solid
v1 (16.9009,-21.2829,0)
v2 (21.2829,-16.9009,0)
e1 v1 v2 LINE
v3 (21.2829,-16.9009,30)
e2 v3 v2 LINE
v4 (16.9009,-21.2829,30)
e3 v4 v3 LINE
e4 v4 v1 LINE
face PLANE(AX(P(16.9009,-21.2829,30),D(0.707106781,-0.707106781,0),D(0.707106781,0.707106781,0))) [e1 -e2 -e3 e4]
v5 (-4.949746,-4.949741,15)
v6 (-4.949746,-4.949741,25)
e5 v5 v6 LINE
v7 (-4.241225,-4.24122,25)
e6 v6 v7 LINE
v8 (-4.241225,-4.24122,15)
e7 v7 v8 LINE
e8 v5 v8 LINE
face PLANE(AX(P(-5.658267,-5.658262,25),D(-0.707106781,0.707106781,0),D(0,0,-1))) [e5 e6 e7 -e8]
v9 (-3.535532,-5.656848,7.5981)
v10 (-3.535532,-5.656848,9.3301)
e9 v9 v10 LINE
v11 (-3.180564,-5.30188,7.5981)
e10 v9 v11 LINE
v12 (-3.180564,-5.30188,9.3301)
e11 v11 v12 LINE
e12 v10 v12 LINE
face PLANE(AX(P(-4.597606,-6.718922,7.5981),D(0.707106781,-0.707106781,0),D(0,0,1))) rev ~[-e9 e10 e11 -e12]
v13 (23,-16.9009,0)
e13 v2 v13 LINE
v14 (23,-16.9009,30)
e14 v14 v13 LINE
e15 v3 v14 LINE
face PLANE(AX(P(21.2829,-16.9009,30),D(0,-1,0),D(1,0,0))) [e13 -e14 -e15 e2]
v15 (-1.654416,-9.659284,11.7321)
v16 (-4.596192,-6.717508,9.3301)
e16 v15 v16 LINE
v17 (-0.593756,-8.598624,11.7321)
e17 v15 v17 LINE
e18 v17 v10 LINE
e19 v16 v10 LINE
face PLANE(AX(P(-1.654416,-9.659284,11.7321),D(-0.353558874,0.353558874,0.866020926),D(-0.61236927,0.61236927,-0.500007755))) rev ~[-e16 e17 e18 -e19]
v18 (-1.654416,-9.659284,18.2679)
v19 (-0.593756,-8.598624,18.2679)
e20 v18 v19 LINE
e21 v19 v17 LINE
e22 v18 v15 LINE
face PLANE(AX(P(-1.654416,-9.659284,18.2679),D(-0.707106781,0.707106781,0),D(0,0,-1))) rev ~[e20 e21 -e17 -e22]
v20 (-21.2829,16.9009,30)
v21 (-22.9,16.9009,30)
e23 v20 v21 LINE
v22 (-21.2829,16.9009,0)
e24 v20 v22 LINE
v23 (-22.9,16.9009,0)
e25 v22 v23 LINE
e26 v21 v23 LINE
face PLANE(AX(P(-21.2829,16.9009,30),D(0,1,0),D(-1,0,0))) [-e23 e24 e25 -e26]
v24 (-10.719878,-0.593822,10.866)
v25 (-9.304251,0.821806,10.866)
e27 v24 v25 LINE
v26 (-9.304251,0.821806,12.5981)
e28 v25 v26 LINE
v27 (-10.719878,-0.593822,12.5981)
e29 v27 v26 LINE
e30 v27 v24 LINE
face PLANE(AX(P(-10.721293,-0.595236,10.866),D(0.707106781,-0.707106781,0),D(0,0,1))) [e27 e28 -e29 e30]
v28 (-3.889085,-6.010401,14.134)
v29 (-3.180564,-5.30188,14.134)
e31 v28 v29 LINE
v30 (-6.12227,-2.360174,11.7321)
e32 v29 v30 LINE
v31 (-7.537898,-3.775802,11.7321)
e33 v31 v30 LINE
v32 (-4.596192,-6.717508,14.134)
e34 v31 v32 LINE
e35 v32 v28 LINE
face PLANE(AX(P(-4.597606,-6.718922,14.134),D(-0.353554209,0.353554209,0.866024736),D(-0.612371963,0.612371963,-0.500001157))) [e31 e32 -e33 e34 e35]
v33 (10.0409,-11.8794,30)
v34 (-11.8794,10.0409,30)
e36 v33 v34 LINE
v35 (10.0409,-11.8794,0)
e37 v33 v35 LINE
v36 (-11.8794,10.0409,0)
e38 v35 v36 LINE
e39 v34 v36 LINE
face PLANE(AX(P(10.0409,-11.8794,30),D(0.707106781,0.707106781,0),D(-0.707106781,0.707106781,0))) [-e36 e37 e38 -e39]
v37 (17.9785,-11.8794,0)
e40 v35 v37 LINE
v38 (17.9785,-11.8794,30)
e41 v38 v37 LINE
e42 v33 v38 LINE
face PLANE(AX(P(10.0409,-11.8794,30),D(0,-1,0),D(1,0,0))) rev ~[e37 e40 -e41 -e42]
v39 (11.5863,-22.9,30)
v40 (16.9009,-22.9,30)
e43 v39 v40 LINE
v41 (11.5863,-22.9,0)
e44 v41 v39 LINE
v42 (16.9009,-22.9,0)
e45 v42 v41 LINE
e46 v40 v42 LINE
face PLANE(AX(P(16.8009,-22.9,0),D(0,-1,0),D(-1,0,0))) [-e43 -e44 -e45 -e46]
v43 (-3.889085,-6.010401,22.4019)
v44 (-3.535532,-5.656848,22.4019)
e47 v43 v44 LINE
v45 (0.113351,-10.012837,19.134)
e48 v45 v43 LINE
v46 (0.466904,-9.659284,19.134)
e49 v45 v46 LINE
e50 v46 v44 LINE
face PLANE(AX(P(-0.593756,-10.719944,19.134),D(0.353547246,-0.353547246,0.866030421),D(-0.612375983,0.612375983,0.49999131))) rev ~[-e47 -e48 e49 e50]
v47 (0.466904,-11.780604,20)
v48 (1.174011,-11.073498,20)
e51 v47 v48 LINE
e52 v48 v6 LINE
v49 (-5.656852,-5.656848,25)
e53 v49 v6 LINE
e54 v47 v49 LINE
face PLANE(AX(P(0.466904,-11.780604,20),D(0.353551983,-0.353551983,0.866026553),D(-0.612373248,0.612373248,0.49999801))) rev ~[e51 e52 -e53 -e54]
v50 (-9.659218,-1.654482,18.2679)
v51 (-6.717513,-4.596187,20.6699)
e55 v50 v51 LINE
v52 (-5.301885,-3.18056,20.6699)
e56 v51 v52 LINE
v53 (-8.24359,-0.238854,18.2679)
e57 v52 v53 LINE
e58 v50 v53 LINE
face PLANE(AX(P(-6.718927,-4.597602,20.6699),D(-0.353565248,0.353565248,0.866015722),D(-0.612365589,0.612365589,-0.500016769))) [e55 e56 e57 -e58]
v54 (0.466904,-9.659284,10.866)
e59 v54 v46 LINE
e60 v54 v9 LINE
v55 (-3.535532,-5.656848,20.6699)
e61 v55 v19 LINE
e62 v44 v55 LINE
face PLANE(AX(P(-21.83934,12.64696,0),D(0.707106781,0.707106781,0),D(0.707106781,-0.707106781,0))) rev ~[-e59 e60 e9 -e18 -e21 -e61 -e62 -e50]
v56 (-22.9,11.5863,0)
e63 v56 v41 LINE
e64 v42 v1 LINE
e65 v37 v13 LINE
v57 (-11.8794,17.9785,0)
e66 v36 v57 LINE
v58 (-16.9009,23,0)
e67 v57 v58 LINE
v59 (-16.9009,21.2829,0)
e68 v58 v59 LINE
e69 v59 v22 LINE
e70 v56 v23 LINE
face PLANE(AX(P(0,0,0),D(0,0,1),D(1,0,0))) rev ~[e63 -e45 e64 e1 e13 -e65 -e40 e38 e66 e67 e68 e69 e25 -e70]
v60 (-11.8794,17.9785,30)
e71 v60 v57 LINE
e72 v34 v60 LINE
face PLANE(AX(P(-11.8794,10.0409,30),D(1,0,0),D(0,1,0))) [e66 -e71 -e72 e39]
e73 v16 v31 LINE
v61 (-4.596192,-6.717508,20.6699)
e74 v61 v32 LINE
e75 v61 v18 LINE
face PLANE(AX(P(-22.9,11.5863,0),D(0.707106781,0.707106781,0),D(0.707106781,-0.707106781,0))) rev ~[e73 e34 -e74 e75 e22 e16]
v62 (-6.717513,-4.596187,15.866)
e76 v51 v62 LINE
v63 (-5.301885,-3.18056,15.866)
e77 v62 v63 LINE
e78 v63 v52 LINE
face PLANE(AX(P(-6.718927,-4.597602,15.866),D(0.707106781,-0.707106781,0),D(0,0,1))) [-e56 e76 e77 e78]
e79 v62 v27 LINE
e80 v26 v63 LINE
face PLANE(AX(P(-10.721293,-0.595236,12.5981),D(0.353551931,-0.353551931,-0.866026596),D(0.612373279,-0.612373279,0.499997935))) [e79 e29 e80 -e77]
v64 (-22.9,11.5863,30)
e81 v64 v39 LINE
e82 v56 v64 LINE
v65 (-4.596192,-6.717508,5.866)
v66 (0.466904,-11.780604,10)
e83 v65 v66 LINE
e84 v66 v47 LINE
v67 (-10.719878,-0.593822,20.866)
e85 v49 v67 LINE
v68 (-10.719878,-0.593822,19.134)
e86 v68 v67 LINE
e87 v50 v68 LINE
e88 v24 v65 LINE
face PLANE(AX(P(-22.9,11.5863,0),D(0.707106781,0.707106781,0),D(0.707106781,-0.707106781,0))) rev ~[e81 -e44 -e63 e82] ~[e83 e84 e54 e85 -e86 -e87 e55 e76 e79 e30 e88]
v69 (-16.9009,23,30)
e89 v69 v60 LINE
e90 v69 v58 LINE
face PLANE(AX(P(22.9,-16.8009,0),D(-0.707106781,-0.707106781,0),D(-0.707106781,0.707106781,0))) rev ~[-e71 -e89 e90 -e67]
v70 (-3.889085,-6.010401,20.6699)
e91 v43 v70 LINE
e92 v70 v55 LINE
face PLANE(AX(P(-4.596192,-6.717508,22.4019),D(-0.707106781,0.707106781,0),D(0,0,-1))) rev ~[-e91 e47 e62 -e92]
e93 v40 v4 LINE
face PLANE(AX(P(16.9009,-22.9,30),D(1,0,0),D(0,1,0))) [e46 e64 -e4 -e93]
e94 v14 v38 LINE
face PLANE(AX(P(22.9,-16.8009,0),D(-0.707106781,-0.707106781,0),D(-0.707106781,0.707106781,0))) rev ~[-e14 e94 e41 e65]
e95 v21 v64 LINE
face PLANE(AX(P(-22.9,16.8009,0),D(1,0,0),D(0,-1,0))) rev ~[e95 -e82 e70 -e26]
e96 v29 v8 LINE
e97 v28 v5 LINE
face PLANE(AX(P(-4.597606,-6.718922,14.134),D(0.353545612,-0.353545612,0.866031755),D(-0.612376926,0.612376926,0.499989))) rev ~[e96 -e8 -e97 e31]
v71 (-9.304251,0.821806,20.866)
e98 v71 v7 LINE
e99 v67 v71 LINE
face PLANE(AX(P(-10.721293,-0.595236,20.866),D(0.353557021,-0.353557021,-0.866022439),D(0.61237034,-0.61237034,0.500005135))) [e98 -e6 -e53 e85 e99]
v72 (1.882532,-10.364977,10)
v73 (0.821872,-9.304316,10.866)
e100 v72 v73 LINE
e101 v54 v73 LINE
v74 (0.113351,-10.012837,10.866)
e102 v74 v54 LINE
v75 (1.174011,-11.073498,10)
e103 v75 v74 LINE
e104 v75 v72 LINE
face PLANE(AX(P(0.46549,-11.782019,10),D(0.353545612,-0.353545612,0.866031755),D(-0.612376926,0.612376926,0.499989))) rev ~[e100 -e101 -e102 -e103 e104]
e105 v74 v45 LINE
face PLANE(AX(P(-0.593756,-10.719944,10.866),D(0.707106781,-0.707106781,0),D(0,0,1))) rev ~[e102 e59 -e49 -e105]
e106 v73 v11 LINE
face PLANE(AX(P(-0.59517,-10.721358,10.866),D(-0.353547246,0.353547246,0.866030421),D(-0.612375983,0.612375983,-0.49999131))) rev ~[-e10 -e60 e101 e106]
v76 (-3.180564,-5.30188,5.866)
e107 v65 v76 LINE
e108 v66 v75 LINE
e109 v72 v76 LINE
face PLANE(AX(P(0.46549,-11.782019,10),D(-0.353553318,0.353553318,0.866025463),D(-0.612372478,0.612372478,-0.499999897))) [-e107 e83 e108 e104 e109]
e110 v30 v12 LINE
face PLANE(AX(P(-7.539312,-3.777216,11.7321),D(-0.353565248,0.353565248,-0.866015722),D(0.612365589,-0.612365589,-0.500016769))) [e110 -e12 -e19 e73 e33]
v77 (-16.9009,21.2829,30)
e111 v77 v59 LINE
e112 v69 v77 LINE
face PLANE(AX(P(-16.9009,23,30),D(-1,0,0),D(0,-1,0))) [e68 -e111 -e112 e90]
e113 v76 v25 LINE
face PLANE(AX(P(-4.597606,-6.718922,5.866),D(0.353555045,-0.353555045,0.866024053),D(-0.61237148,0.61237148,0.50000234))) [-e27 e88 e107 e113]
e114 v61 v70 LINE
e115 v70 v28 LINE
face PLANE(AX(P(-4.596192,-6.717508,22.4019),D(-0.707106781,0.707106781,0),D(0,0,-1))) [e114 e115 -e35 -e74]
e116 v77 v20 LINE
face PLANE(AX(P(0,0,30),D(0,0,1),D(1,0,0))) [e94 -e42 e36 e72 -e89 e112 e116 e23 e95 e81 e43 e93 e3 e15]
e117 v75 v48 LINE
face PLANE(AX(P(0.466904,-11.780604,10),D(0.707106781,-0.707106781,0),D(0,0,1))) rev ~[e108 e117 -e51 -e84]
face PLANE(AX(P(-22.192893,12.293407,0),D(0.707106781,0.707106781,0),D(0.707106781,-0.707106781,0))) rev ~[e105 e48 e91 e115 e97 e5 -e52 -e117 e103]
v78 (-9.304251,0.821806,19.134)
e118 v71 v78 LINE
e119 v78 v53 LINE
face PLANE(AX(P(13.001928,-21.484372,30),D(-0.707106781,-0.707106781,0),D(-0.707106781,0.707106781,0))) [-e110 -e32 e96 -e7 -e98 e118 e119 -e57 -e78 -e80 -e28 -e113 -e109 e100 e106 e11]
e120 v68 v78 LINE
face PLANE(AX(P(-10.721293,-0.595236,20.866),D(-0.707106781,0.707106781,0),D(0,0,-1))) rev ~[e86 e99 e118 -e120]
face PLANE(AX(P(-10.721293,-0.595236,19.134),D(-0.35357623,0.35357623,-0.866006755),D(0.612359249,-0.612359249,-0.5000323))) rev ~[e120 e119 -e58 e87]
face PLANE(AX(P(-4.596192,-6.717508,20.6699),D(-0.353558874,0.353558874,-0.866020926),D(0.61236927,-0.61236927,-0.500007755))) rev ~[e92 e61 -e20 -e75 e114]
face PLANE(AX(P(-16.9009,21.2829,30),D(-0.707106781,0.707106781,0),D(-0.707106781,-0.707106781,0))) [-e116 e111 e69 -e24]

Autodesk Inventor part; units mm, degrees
ref_plane "YZ Plane" through (0, 0, 0) normal (1, 0, 0) x (0, 1, 0)
ref_plane "XZ Plane" through (0, 0, 0) normal (0, 1, 0) x (-1, 0, 0)
ref_plane "XY Plane" through (0, 0, 0) normal (0, 0, 1) x (1, 0, 0)
sketch "Sketch1" plane through (0, 0, 0) normal (0, 0, 1) x (1, 0, 0)
  line L0 (-16.9, 21.4) -> (-16.9, 16.9) construction
  arc A0 (-22.9, 19.9) -> (-19.9, 22.9) centre (-19.9, 19.9) ccw construction
  line L1 (-16.9, 16.9) -> (16.9, 16.9) construction
  line L2 (16.9, 16.9) -> (16.9, -16.9) construction
  line L3 (16.9, -16.9) -> (-16.9, -16.9) construction
  line L4 (-16.9, -16.9) -> (-16.9, 16.9) construction
  arc A1 (22.9, -19.9) -> (19.9, -22.9) centre (19.9, -19.9) ccw construction
  line L5 (22.9, 19.9) -> (22.9, -19.9) construction
  arc A2 (19.9, 22.9) -> (22.9, 19.9) centre (19.9, 19.9) ccw construction
  line L6 (-19.9, 22.9) -> (19.9, 22.9) construction
  arc A3 (-22.9, 19.9) -> (-19.9, 22.9) centre (-19.9, 19.9) ccw construction
  line L7 (-22.9, -19.9) -> (-22.9, 19.9) construction
  arc A4 (-19.9, -22.9) -> (-22.9, -19.9) centre (-19.9, -19.9) ccw construction
  line L8 (19.9, -22.9) -> (-19.9, -22.9) construction
  line L9 (-21.4, 16.9) -> (-16.9, 16.9) construction
  line L10 (-16.9, -16.9) -> (-21.4, -16.9) construction
  line L11 (-16.9, -16.9) -> (-16.9, -21.4) construction
  line L12 (16.9, -21.4) -> (16.9, -16.9) construction
  line L13 (21.4, -16.9) -> (16.9, -16.9) construction
  line L14 (16.9, 16.9) -> (21.4, 16.9) construction
  line L15 (16.9, 16.9) -> (16.9, 21.4) construction
  line L16 (-16.8009, 21.2415) -> (21.2415, -16.8009)
  line L17 (21.2415, -16.8009) -> (16.8009, -21.2415)
  line L18 (16.8009, -21.2415) -> (-21.2415, 16.8009)
  line L19 (-21.2415, 16.8009) -> (-16.8009, 21.2415)
  line L20 (-16.8009, 21.2415) -> (16.8009, -21.2415) construction
  line L21 (21.2415, -16.8009) -> (-21.2415, 16.8009) construction
  line L22 (-16.8009, 21.2415) -> (36.9991, 21.2415) construction
  line L23 (-21.2415, 16.8009) -> (-22.9, 16.8009)
  line L24 (16.8009, -21.2415) -> (16.8009, -22.9)
  line L25 (16.8009, -22.9) -> (-22.9, 16.8009)
  line L26 (-16.8009, 21.2415) -> (-16.8009, 22.9)
  line L27 (21.2415, -16.8009) -> (22.9, -16.8009)
  line L28 (22.9, -16.8009) -> (-16.8009, 22.9)
  line L29 (-22.9, 16.8009) -> (-22.9, 11.5863)
  line L30 (16.8009, -22.9) -> (11.5863, -22.9)
  line L31 (-22.9, 11.5863) -> (11.5863, -22.9)
  point P0 (0, 0)
  dimension "d0" = 53.8
  dimension "d1" = 45
  dimension "d2" = 6.28
  dimension "d5" = 8
extrude "Extrusion1" add sketch "Sketch1" along normal blind 30
ref_plane "Work Plane1" through (16.9, -16.9, -8) normal (-0.7071068, -0.7071068, 0) x (0, 0, 1)
sketch "Sketch7" plane through (0, 0, 30) normal (0, 0, 1) x (1, 0, 0)
  line L0 (21.2415, -16.8009) -> (22.9, -16.8009) projected
  line L1 (22.9, -16.8009) -> (-16.8009, 22.9) projected
  line L2 (-16.8009, 22.9) -> (-16.8009, 21.2415) projected
  line L3 (-16.8009, 21.2415) -> (-21.2415, 16.8009) projected
  line L4 (-21.2415, 16.8009) -> (-22.9, 16.8009) projected
  line L5 (-22.9, 16.8009) -> (-22.9, 11.5863) projected
  line L6 (-22.9, 11.5863) -> (11.5863, -22.9) projected
  line L7 (11.5863, -22.9) -> (16.8009, -22.9) projected
  line L8 (16.8009, -22.9) -> (16.8009, -21.2415) projected
  line L9 (16.8009, -21.2415) -> (21.2415, -16.8009) projected
  line L10 (3.0496, 3.0496) -> (-5.6569, -5.6569)
  line L11 (-22.9, 11.5863) -> (11.5863, -22.9) projected
  line L12 (17.9785, -3.9418) -> (10.0409, -11.8794)
  line L13 (10.0409, -11.8794) -> (-11.8794, 10.0409)
  line L14 (-11.8794, 10.0409) -> (-3.9418, 17.9785)
  line L15 (-3.9418, 17.9785) -> (17.9785, -3.9418)
  line L16 (17.9785, -3.9418) -> (-11.8794, 10.0409) construction
  line L17 (10.0409, -11.8794) -> (-3.9418, 17.9785) construction
  line L18 (-11.8794, 10.0409) -> (-11.8794, 17.9785)
  line L19 (22.9, -16.8009) -> (-16.8009, 22.9) projected
  line L20 (10.0409, -11.8794) -> (17.9785, -11.8794)
  point P0 (0, 0)
  dimension "d28" = 31
  dimension "d29" = 1.3
extrude "Extrusion7" cut sketch "Sketch7" against normal through all contours L20 L12 L1 | L12 L13 L10 L1 | L1 L14 L15 L12 | L10 L13 L14 L1 | L14 L18 L1
sketch "Sketch10" plane through (11.5863, -22.9, 30) normal (-0.7071068, -0.7071068, 0) x (-0.7071068, 0.7071068, 0)
  line L0 (1.6838, 16.5215) -> (7.0744, 16.5215) construction
  line L1 (7.0744, 16.5215) -> (7.0744, 10.5304) construction
  line L2 (7.0744, 10.5304) -> (1.6838, 10.5304) construction
  line L3 (1.6838, 10.5304) -> (1.6838, 6.839) construction
  line L4 (1.6838, 6.839) -> (6.7206, 6.839) construction
  line L5 (6.7206, 6.839) -> (6.7206, 1.2092) construction
  line L6 (6.7206, 1.2092) -> (1.6838, 1.2092) construction
  line L7 (1.6838, 1.2092) -> (1.6838, -3.423) construction
  line L8 (1.6838, -3.423) -> (34.6838, -3.423) construction
  line L9 (34.6838, 30.377) -> (1.6838, 30.377) construction
  line L10 (1.6838, 30.377) -> (1.6838, 26.2152) construction
  line L11 (1.6838, 26.2152) -> (7.1181, 26.2152) construction
  line L12 (7.1181, 26.2152) -> (7.1181, 20.0634) construction
  line L13 (7.1181, 20.0634) -> (1.6838, 20.0634) construction
  line L14 (1.6838, 20.0634) -> (1.6838, 16.5215) construction
  line L15 (7.0744, 13.526) -> (34.6838, 13.477) construction
  line L16 (1.6838, 30.377) -> (36.6838, 30.377) construction
  line L17 (36.6838, -3.423) -> (1.6838, -3.423) construction
  line L18 (15.7252, 20) -> (15.7252, 10)
  line L19 (15.7252, 10) -> (24.3855, 5)
  line L20 (15.7252, 20) -> (17.2252, 19.134)
  line L21 (17.2252, 19.134) -> (17.2252, 10.866)
  line L22 (17.2252, 10.866) -> (22.8855, 7.5981)
  line L23 (22.8855, 7.5981) -> (22.8855, 15.866)
  line L24 (22.8855, 15.866) -> (24.3855, 15)
  line L25 (24.3855, 15) -> (24.3855, 5)
  line L26 (34.6838, 30.377) -> (34.6838, -3.423)
  line L27 (24.3855, 31.8785) -> (24.3855, -1.9215) construction
  line L28 (1.6838, -3.423) -> (34.6838, -3.423) construction
  line L29 (34.6838, 30.377) -> (34.6838, 30.377) construction
  line L30 (34.6838, 30.377) -> (34.6838, -3.423) construction
  line L31 (34.6838, -3.423) -> (34.6838, -3.423) construction
  line L32 (34.6838, -3.423) -> (34.6838, 30.377) construction
  line L33 (48.771, 30) -> (0, 30) construction
  line L34 (0, 30) -> (0, 0) construction
  line L35 (48.771, 0) -> (0, 0) construction
  line L36 (48.771, 30) -> (48.771, 0) construction
  line L37 (24.3855, 30) -> (24.3855, 0) construction
  line L38 (48.771, 0) -> (0, 0) construction
  line L39 (48.771, 30) -> (48.771, 0) construction
  line L40 (48.771, 15) -> (0, 15) construction
  line L41 (0, 30) -> (0, 0) construction
  point P0 (24.3855, 15)
  dimension "d40" = 1.5
  dimension "d41" = 1.5
  dimension "d42" = 1.5
  dimension "d43" = 10
  dimension "d44" = 10
emboss "Emboss1" sketch "Sketch10" operation cut depth 1 direction (0.7071068, 0.7071068, 0)
sketch "Sketch11" plane through (11.5863, -22.9, 30) normal (-0.7071068, -0.7071068, 0) x (-0.7071068, 0.7071068, 0)
  line L0 (17.2252, 10.866) -> (22.8855, 7.5981) construction
  line L1 (22.8855, 7.5981) -> (22.8855, 15.866) construction
  line L2 (22.8855, 15.866) -> (24.3855, 15) construction
  line L3 (24.3855, 15) -> (24.3855, 5) construction
  line L4 (24.3855, 5) -> (15.7252, 10) construction
  line L5 (15.7252, 10) -> (15.7252, 20) construction
  line L6 (15.7252, 20) -> (17.2252, 19.134) construction
  line L7 (17.2252, 19.134) -> (17.2252, 10.866) construction
  line L8 (48.771, 30) -> (0, 30) construction
  line L9 (0, 30) -> (0, 0) construction
  line L10 (48.771, 0) -> (0, 0) construction
  line L11 (48.771, 30) -> (48.771, 0) construction
  line L12 (15.7252, 20) -> (17.2252, 19.134) construction
  line L13 (17.2252, 19.134) -> (17.2252, 10.866) construction
  line L14 (17.2252, 10.866) -> (22.8855, 7.5981) construction
  line L15 (22.8855, 7.5981) -> (22.8855, 15.866) construction
  line L16 (22.8855, 15.866) -> (24.3855, 15) construction
  line L17 (24.3855, 15) -> (24.3855, 5) construction
  line L18 (24.3855, 5) -> (15.7252, 10) construction
  line L19 (15.7252, 10) -> (15.7252, 20) construction
  line L20 (15.5651, 18.4016) -> (15.5, -16.9) construction
  line L21 (15.5651, 18.4016) -> (-17.5, 16.9) construction
  line L22 (-17.5, 16.9) -> (-17.5, 12.7382) construction
  line L23 (-17.5, 12.7382) -> (-12.0658, 12.7382) construction
  line L24 (-12.0658, 12.7382) -> (-12.0658, 6.5864) construction
  line L25 (-12.0658, 6.5864) -> (-17.5, 6.5864) construction
  line L26 (-17.5, 6.5864) -> (-17.5, 3.0446) construction
  line L27 (-17.5, 3.0446) -> (-12.1095, 3.0446) construction
  line L28 (-12.1095, 3.0446) -> (-12.1095, -2.9465) construction
  line L29 (-12.1095, -2.9465) -> (-17.5, -2.9465) construction
  line L30 (-17.5, -2.9465) -> (-17.5, -6.638) construction
  line L31 (-17.5, -6.638) -> (-12.4632, -6.638) construction
  line L32 (-12.4632, -6.638) -> (-12.4632, -12.2678) construction
  line L33 (-12.4632, -12.2678) -> (-17.5, -12.2678) construction
  line L34 (-17.5, -12.2678) -> (-17.5, -16.9) construction
  line L35 (-17.5, -16.9) -> (15.5, -16.9) construction
  line L36 (-12.1095, 0.049) -> (15.5326, 0.7508) construction
  line L37 (15.5, -16.9) -> (15.5651, 18.4016) construction
  line L38 (1.91, 17.7815) -> (1.91, -16.9) construction
  line L39 (15.5, -16.9) -> (-17.5, -16.9) construction
  line L40 (22.8855, 7.5981) -> (22.8855, 15.866) construction
  line L41 (17.2252, 19.134) -> (17.2252, 10.866)
  line L42 (17.2252, 10.866) -> (22.8855, 7.5981)
  line L43 (17.2252, 19.134) -> (17.2252, 10.866)
  line L44 (17.2252, 10.866) -> (22.8855, 7.5981)
  line L45 (22.8855, 7.5981) -> (22.8855, 9.3301)
  line L46 (22.8855, 7.5981) -> (22.8855, 15.866)
  line L47 (22.8855, 9.3301) -> (18.7252, 11.7321)
  line L48 (18.7252, 11.7321) -> (18.7252, 18.2679)
  line L49 (18.7252, 18.2679) -> (22.8855, 20.6699)
  line L50 (17.2252, 19.134) -> (22.8855, 22.4019)
  line L51 (22.8855, 22.4019) -> (22.8855, 20.6699)
  point P0 (24.3855, 30)
  point P1 (20.9754, 14.9785)
  dimension "d47" = 120
  dimension "d48" = 1.5
  dimension "d49" = 1.5
  dimension "d50" = 1.5
emboss "Emboss2" sketch "Sketch11" operation cut depth 1.5 direction (0.7071068, 0.7071068, 0)
sketch "Sketch12" plane through (11.5863, -22.9, 30) normal (-0.7071068, -0.7071068, 0) x (-0.7071068, 0.7071068, 0)
  line L0 (18.7252, 11.7321) -> (22.8855, 9.3301) construction
  line L1 (22.8855, 9.3301) -> (22.8855, 15.866) construction
  line L2 (22.8855, 15.866) -> (24.3855, 15) construction
  line L3 (24.3855, 15) -> (24.3855, 5) construction
  line L4 (24.3855, 5) -> (15.7252, 10) construction
  line L5 (15.7252, 10) -> (15.7252, 20) construction
  line L6 (15.7252, 20) -> (17.2252, 19.134) construction
  line L7 (17.2252, 19.134) -> (22.8855, 22.4019) construction
  line L8 (22.8855, 22.4019) -> (22.8855, 20.6699) construction
  line L9 (22.8855, 20.6699) -> (18.7252, 18.2679) construction
  line L10 (18.7252, 18.2679) -> (18.7252, 11.7321) construction
  line L11 (48.771, 30) -> (0, 30) construction
  line L12 (0, 30) -> (0, 0) construction
  line L13 (48.771, 0) -> (0, 0) construction
  line L14 (48.771, 30) -> (48.771, 0) construction
  line L15 (18.7252, 11.7321) -> (22.8855, 9.3301) construction
  line L16 (22.8855, 9.3301) -> (22.8855, 15.866) construction
  line L17 (22.8855, 15.866) -> (24.3855, 15) construction
  line L18 (24.3855, 15) -> (24.3855, 5) construction
  line L19 (24.3855, 5) -> (15.7252, 10) construction
  line L20 (15.7252, 10) -> (15.7252, 20) construction
  line L21 (15.7252, 20) -> (17.2252, 19.134) construction
  line L22 (17.2252, 19.134) -> (22.8855, 22.4019) construction
  line L23 (22.8855, 22.4019) -> (22.8855, 20.6699) construction
  line L24 (22.8855, 20.6699) -> (18.7252, 18.2679) construction
  line L25 (18.7252, 18.2679) -> (18.7252, 11.7321) construction
  line L26 (15.5651, 18.4016) -> (15.5, -16.9) construction
  line L27 (15.5651, 18.4016) -> (-17.5, 16.9) construction
  line L28 (-17.5, 16.9) -> (-17.5, 12.7382) construction
  line L29 (-17.5, 12.7382) -> (-12.0658, 12.7382) construction
  line L30 (-12.0658, 12.7382) -> (-12.0658, 6.5864) construction
  line L31 (-12.0658, 6.5864) -> (-17.5, 6.5864) construction
  line L32 (-17.5, 6.5864) -> (-17.5, 3.0446) construction
  line L33 (-17.5, 3.0446) -> (-12.1095, 3.0446) construction
  line L34 (-12.1095, 3.0446) -> (-12.1095, -2.9465) construction
  line L35 (-12.1095, -2.9465) -> (-17.5, -2.9465) construction
  line L36 (-17.5, -2.9465) -> (-17.5, -6.638) construction
  line L37 (-17.5, -6.638) -> (-12.4632, -6.638) construction
  line L38 (-12.4632, -6.638) -> (-12.4632, -12.2678) construction
  line L39 (-12.4632, -12.2678) -> (-17.5, -12.2678) construction
  line L40 (-17.5, -12.2678) -> (-17.5, -16.9) construction
  line L41 (-17.5, -16.9) -> (15.5, -16.9) construction
  line L42 (17.2252, 19.134) -> (22.8855, 22.4019)
  line L43 (15.7252, 20) -> (17.2252, 19.134)
  line L44 (17.2252, 19.134) -> (22.8855, 22.4019)
  line L45 (22.8855, 22.4019) -> (22.8855, 20.6699)
  line L46 (22.8855, 22.4019) -> (22.8855, 20.6699)
  line L47 (22.8855, 31.8785) -> (22.8855, -1.9215) construction
  line L48 (22.8855, 9.3301) -> (22.8855, 15.866) construction
  line L49 (15.7252, 20) -> (22.8855, 24.134)
  line L50 (22.8855, 24.134) -> (31.5457, 19.134)
  line L51 (31.5457, 19.134) -> (31.5457, 17.4019)
  line L52 (31.5457, 17.4019) -> (25.8855, 14.134)
  line L53 (25.8855, 14.134) -> (25.8855, 9.3301)
  line L54 (25.8855, 9.3301) -> (30.0457, 11.7321)
  line L55 (31.5457, 9.134) -> (31.5457, 9.134)
  line L56 (24.3855, 5) -> (15.7252, 10)
  line L57 (31.5457, 9.134) -> (24.3855, 5)
  line L58 (22.8855, 15.866) -> (24.3855, 15)
  line L59 (24.3855, 5) -> (24.3855, 15)
  line L60 (24.3855, 15) -> (22.8855, 15.866)
  line L61 (22.8855, 20.6699) -> (18.7252, 18.2679)
  line L62 (22.8855, 20.6699) -> (22.8855, 22.4019)
  line L63 (24.3855, 15) -> (24.3855, 5)
  line L64 (22.8855, 15.866) -> (27.0457, 18.2679)
  line L65 (27.0457, 18.2679) -> (22.8855, 20.6699)
  line L66 (15.7252, 10) -> (24.3855, 5) construction
  line L67 (18.7252, 11.7321) -> (22.8855, 9.3301) construction
  line L68 (18.7252, 11.7321) -> (24.3855, 8.4641) construction
  line L69 (24.3855, 8.4641) -> (34.3988, 14.2453) construction
  line L70 (24.3855, 15) -> (31.5457, 19.134) construction
  line L71 (24.3855, 5) -> (39.2099, 13.5589) construction
  line L72 (27.0457, 18.2679) -> (31.2025, 17.6001) construction
  line L73 (22.8855, 22.4019) -> (22.8855, 20.6699) construction
  line L74 (31.2025, 17.6001) -> (22.8855, 22.4019) construction
  line L75 (31.5457, 9.134) -> (31.5457, 10.866)
  line L76 (31.5457, 10.866) -> (30.0457, 11.7321)
  line L77 (18.7252, 11.7321) -> (22.8855, 9.3301) construction
  line L78 (18.7252, 18.2679) -> (18.7252, 11.7321) construction
  line L79 (22.8855, 20.6699) -> (18.7252, 18.2679) construction
  line L80 (22.8855, 22.4019) -> (22.8855, 20.6699) construction
  line L81 (17.2252, 19.134) -> (22.8855, 22.4019) construction
  line L82 (17.2252, 10.866) -> (17.2252, 19.134) construction
  line L83 (22.8855, 7.5981) -> (17.2252, 10.866) construction
  line L84 (22.8855, 9.3301) -> (22.8855, 7.5981) construction
  line L85 (22.8855, 7.5981) -> (24.3855, 6.7321) construction
  line L86 (24.3855, 6.7321) -> (34.2349, 12.4186) construction
  point P0 (24.3855, 30)
  point P1 (20.9754, 14.9785)
  dimension "d54" = 60
  dimension "d55" = 1.5
  dimension "d56" = 120
  dimension "d57" = 120
  dimension "d58" = 1.5
  dimension "d59" = 120
extrude "Extrusion9" cut sketch "Sketch12" against normal blind 2
sketch "Sketch13" plane through (0, 0, 30) normal (0, 0, 1) x (1, 0, 0)
  line L0 (-11.8794, 10.0409) -> (-11.8794, 17.9785) construction
  line L1 (-11.8794, 17.9785) -> (-16.8009, 22.9) construction
  line L2 (-16.8009, 22.9) -> (-16.8009, 21.2415) projected
  line L3 (-16.8009, 21.2415) -> (-21.2415, 16.8009) projected
  line L4 (-21.2415, 16.8009) -> (-22.9, 16.8009) projected
  line L5 (-22.9, 16.8009) -> (-22.9, 11.5863) construction
  line L6 (-22.9, 11.5863) -> (11.5863, -22.9) construction
  line L7 (11.5863, -22.9) -> (16.8009, -22.9) construction
  line L8 (16.8009, -22.9) -> (16.8009, -21.2415) projected
  line L9 (16.8009, -21.2415) -> (21.2415, -16.8009) projected
  line L10 (21.2415, -16.8009) -> (22.9, -16.8009) projected
  line L11 (22.9, -16.8009) -> (17.9785, -11.8794) construction
  line L12 (17.9785, -11.8794) -> (10.0409, -11.8794) construction
  line L13 (10.0409, -11.8794) -> (-11.8794, 10.0409) construction
  line L14 (-11.7794, 10.0823) -> (-11.7794, 18.02) construction
  line L15 (-11.7794, 18.02) -> (-16.9009, 23.1414) construction
  line L16 (-16.9009, 23.1414) -> (-16.9009, 21.2829)
  line L17 (-16.9009, 21.2829) -> (-21.2829, 16.9009)
  line L18 (-21.2829, 16.9009) -> (-23, 16.9009)
  line L19 (-23, 16.9009) -> (-23, 11.5449) construction
  line L20 (-23, 11.5449) -> (11.5449, -23) construction
  line L21 (11.5449, -23) -> (16.9009, -23) construction
  line L22 (16.9009, -23) -> (16.9009, -21.2829)
  line L23 (16.9009, -21.2829) -> (21.2829, -16.9009)
  line L24 (21.2829, -16.9009) -> (23.1414, -16.9009)
  line L25 (23.1414, -16.9009) -> (18.02, -11.7794) construction
  line L26 (18.02, -11.7794) -> (10.0823, -11.7794) construction
  line L27 (10.0823, -11.7794) -> (-11.7794, 10.0823) construction
  line L28 (16.8009, -22.9) -> (16.9009, -22.9)
  line L29 (22.9, -16.8009) -> (23, -16.9009)
  line L30 (-21.2415, 16.8009) -> (-22.9, 16.8009) projected
  line L31 (-22.9, 16.8009) -> (-22.9, 16.9009)
  line L32 (-16.8009, 22.9) -> (-16.9009, 23)
  point P0 (0, 0)
  dimension "d65" = 0.1
extrude "IM_offset" add sketch "Sketch13" against normal up to surface (30 mm away)
equation "\"d3\" = MirrorThickness1"
equation "\"d41\" = d40"
equation "\"d42\" = d40"
equation "\"d44\" = d43"
equation "\"d48\" = d51"
equation "\"d49\" = d51"
equation "\"d50\" = d51"
equation "\"d55\" = d60"
equation "\"d58\" = d60"
equation "\"MirrorThickness1\" = 30"
equation "\"d51\" = 1.5"
equation "\"d60\" = 1.5"
properties part number "20_Cube_Insert_Mirror_Holder_wLogo_v3"
